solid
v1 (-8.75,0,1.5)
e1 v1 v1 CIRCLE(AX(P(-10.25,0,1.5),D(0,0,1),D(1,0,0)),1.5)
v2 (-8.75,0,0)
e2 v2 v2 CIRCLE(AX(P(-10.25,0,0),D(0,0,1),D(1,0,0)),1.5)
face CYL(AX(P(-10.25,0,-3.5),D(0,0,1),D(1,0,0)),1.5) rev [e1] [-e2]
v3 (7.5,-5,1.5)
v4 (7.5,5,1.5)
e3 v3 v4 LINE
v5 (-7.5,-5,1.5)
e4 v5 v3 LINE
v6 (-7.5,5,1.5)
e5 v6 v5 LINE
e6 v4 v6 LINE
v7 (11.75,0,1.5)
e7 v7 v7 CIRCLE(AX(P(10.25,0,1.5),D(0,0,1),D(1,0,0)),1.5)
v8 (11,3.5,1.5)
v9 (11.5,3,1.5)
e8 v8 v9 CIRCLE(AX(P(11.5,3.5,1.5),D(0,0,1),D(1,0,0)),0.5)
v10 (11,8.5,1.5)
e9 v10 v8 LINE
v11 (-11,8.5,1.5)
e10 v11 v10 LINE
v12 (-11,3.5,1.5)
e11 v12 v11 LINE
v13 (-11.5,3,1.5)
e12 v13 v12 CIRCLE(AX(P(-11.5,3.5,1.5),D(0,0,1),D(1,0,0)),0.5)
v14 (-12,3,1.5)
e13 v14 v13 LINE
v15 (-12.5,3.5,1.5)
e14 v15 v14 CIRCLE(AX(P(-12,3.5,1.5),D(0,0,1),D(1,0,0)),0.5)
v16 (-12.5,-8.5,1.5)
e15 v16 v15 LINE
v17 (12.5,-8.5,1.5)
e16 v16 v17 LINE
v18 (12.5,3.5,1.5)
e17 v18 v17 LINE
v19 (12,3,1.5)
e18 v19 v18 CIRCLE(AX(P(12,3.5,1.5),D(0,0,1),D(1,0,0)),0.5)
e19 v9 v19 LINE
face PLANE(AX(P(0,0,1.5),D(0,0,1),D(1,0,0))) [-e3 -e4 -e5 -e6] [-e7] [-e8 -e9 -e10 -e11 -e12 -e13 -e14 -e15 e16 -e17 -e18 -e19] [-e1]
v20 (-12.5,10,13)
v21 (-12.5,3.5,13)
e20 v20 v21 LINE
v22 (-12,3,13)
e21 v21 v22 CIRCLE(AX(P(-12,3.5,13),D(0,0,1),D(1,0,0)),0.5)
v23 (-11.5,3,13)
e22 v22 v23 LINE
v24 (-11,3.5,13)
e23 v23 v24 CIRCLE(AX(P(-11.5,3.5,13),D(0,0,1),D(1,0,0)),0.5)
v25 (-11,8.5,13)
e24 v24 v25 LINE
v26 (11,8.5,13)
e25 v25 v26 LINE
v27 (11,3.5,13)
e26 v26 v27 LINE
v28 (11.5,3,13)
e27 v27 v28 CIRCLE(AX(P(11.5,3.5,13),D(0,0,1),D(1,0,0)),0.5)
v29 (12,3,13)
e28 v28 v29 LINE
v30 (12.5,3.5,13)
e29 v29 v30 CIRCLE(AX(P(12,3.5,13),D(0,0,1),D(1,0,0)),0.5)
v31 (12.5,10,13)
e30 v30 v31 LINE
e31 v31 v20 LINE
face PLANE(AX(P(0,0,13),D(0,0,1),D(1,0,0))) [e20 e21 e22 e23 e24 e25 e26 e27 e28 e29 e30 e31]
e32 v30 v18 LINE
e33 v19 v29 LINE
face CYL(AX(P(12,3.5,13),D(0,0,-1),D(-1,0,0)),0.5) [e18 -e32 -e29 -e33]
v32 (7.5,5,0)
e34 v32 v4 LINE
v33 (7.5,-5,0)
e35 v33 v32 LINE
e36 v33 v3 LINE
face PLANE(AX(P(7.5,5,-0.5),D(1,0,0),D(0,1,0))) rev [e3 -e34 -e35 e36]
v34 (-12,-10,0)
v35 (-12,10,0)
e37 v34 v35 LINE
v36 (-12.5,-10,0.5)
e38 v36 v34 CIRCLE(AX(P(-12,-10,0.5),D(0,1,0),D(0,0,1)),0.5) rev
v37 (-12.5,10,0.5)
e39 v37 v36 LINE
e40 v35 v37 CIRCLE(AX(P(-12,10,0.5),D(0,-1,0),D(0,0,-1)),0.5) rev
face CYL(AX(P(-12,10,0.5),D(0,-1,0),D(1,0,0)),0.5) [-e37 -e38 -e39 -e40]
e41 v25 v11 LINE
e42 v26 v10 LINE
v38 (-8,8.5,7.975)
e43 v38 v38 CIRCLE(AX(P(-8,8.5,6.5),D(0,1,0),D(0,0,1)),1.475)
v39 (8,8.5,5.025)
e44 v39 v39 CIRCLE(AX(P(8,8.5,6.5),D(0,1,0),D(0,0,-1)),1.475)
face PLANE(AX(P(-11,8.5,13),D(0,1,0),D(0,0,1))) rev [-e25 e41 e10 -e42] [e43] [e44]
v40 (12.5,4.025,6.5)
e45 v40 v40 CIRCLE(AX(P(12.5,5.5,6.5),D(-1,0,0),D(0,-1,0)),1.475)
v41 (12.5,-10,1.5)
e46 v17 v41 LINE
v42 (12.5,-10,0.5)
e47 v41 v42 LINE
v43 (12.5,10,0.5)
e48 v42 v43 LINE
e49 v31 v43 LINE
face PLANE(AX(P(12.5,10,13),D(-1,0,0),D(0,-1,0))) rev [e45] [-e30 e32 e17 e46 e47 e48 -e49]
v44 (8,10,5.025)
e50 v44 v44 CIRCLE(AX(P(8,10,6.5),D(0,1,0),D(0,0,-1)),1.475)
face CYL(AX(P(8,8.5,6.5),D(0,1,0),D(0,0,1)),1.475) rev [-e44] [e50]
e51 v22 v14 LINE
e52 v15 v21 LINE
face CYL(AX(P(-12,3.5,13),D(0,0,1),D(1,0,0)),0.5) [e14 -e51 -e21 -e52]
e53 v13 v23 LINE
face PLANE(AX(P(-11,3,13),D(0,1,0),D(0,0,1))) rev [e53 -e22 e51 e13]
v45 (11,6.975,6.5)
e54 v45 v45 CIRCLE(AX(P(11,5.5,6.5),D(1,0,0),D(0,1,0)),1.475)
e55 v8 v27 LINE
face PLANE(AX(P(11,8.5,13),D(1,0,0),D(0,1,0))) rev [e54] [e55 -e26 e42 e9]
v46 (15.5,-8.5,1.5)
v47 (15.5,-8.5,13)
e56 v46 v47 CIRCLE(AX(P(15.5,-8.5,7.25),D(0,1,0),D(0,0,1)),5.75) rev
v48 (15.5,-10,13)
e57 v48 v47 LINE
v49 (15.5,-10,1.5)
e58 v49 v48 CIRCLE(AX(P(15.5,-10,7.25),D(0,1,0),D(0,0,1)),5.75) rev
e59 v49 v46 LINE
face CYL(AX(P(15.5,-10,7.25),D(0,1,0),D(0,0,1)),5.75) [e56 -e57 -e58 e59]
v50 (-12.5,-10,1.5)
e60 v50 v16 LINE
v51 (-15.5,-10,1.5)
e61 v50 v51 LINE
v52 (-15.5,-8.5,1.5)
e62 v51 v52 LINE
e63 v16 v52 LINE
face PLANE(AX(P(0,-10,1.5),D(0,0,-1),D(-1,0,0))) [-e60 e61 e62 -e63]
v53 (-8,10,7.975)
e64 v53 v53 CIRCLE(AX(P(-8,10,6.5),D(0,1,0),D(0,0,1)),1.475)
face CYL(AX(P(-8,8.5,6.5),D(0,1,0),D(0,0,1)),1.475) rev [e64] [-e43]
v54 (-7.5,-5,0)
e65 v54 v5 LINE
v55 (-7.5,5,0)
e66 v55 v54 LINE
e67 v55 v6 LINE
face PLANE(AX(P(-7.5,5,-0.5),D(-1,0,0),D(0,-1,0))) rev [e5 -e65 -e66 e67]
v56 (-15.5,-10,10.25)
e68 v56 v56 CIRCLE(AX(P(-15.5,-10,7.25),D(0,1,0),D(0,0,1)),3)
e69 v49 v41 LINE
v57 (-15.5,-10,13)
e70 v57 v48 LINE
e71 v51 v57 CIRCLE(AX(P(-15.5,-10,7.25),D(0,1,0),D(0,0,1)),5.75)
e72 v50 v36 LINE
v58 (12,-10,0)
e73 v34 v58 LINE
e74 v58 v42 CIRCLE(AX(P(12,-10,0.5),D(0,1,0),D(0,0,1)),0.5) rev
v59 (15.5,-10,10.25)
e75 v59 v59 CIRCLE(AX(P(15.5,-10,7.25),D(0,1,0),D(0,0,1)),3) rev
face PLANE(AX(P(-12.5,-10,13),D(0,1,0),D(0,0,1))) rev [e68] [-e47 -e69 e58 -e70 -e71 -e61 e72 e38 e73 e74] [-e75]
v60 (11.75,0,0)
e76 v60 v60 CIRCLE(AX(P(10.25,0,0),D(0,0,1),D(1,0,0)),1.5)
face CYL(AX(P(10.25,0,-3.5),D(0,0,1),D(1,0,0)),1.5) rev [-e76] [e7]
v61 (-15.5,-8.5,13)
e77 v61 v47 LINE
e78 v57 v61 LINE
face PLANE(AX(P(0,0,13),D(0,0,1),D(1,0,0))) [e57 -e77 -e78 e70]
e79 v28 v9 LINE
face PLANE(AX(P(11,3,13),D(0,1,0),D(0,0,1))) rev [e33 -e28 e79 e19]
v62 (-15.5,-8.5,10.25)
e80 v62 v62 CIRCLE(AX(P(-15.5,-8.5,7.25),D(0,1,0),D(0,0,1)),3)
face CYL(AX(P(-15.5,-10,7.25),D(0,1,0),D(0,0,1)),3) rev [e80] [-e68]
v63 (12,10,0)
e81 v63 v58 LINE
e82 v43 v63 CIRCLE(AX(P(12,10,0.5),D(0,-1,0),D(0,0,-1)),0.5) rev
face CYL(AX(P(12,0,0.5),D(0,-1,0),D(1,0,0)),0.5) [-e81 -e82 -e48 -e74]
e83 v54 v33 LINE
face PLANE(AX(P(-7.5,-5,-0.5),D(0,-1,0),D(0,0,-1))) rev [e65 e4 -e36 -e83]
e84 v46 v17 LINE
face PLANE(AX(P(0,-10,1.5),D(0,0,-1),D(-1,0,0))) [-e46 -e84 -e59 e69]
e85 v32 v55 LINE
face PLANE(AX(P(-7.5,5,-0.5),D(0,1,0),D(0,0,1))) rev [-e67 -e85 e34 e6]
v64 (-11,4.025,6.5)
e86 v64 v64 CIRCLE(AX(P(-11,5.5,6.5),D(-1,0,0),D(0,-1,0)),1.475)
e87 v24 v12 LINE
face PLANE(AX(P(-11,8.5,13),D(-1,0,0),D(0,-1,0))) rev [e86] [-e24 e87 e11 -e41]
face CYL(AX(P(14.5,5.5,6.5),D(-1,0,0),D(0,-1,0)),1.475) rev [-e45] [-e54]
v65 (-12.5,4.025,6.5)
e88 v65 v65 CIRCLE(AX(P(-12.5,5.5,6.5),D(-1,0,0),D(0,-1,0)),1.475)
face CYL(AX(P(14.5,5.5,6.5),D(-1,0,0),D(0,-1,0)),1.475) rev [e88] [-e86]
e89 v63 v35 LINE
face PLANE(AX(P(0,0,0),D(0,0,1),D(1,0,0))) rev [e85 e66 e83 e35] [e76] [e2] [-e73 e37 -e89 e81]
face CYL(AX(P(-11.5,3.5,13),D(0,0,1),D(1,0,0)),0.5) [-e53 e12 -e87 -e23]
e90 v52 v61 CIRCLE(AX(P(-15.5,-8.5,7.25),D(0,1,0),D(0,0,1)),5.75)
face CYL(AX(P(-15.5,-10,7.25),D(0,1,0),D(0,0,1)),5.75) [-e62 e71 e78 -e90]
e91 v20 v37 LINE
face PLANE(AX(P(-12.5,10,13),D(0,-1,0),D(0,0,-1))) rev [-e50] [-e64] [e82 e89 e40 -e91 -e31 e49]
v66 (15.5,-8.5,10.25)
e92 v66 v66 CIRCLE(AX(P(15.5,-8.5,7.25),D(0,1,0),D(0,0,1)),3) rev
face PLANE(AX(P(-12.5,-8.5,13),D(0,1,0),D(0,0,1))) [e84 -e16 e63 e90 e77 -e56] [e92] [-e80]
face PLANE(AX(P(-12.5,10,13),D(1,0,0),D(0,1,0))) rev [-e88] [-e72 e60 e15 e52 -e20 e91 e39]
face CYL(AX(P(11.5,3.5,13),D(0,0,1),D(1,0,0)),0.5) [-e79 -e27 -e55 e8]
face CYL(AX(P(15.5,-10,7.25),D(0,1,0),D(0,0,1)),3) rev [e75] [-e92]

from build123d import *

# Parameters (mm, degrees)
SKETCH_1_W          = 25
SKETCH_1_H          = 20
EXTRUDE_1_DEPTH     = 13
SHELL_7_T           = -1.5
SKETCH_3_R          = 1.5
CUT_EXTRUDE_1_DEPTH = 5
SKETCH_4_W          = 15
SKETCH_4_H          = 10
CUT_EXTRUDE_2_DEPTH = 2
SKETCH_6_W          = 12.730573974
SKETCH_6_H          = 22.360557323
CUT_EXTRUDE_5_DEPTH = 38.5
EXTRUDE_START       = -1.5
EXTRUDE_4_OUTLINE_R = 3
EXTRUDE_4_DEPTH     = 1.5
EXTRUDE_5_DEPTH     = 11.5
SKETCH_12_R         = 1.475
CUT_EXTRUDE_6_DEPTH = 1.5
SKETCH_14_R         = 1.475
CUT_EXTRUDE_7_DEPTH = 27
FILLET_2_R          = 0.5
FILLET_3_R          = 0.5
FILLET_4_R          = 0.5
FILLET_5_R          = 0.5
FILLET_6_R          = 0.5
FILLET_7_R          = 0.5


with BuildPart() as part:
    # 草图1 → 凸台-拉伸1 (new body)
    with BuildSketch(Plane.XY):
        Rectangle(SKETCH_1_W, SKETCH_1_H)
    extrude(amount=EXTRUDE_1_DEPTH)

    # 抽壳7
    shell_7_openings = [part.faces().sort_by_distance(p)[0] for p in [
        (0, 0, 13),
    ]]
    offset(amount=SHELL_7_T, openings=shell_7_openings, kind=Kind.INTERSECTION)

    # 草图3 → 切除-拉伸1 (cut)
    with BuildSketch(Plane.XY.offset(1.5)):
        with Locations((-10.25, 0)):
            Circle(SKETCH_3_R)
        with Locations((10.25, 0)):
            Circle(SKETCH_3_R)
    extrude(amount=-CUT_EXTRUDE_1_DEPTH, mode=Mode.SUBTRACT)

    # 草图4 → 切除-拉伸2 (cut)
    with BuildSketch(Plane.XY.offset(1.5)):
        Rectangle(SKETCH_4_W, SKETCH_4_H)
    extrude(amount=-CUT_EXTRUDE_2_DEPTH, mode=Mode.SUBTRACT)

    # 草图6 → 切除-拉伸5 (cut, symmetric)
    with BuildSketch(Plane(origin=(-11, 0, 0), x_dir=(0, 0, -1), z_dir=(1, 0, 0))):
        with Locations((-7.865286987, 2.680278662)):
            Rectangle(SKETCH_6_W, SKETCH_6_H)
    extrude(amount=CUT_EXTRUDE_5_DEPTH, both=True, mode=Mode.SUBTRACT)

    # 凸台-拉伸4: read off the stored shape, not the designer's step
    # 凸台-拉伸4 outline → 凸台-拉伸4 (add)
    with BuildSketch(Plane(origin=(0, -8.5, 0), x_dir=(1, 0, 0), z_dir=(0, 1, 0)).offset(EXTRUDE_START)):
        with BuildLine():
            Line((15.5, -1.5), (-15.5, -1.5))
            ThreePointArc((-15.5, -1.5), (-21.25, -7.25), (-15.5, -13))
            Line((-15.5, -13), (15.5, -13))
            ThreePointArc((15.5, -13), (21.25, -7.25), (15.5, -1.5))
        make_face()
        with Locations((-15.5, -7.25)):
            Circle(EXTRUDE_4_OUTLINE_R, mode=Mode.SUBTRACT)
        with Locations((15.5, -7.25)):
            Circle(EXTRUDE_4_OUTLINE_R, mode=Mode.SUBTRACT)
    extrude(amount=EXTRUDE_4_DEPTH)

    # 草图11 → 凸台-拉伸5 (add)
    with BuildSketch(Plane.XY.offset(1.5)):
        Polygon((-11, 8.5), (11, 8.5), (11, 3), (12.5, 3), (12.5, 10), (-12.5, 10), (-12.5, 3), (-11, 3), align=None)
    extrude(amount=EXTRUDE_5_DEPTH)

    # 草图12 → 切除-拉伸6 (cut)
    with BuildSketch(Plane(origin=(0, 10, 0), x_dir=(1, 0, 0), z_dir=(0, 1, 0))):
        with Locations(Location((-8, -6.5, 0), (0, 0, 270))):
            Circle(SKETCH_12_R)
        with Locations(Location((8, -6.5, 0), (0, 0, 90))):
            Circle(SKETCH_12_R)
    extrude(amount=-CUT_EXTRUDE_6_DEPTH, mode=Mode.SUBTRACT)

    # 草图14 → 切除-拉伸7 (cut)
    with BuildSketch(Plane.ZY.offset(12.5)):
        with Locations(Location((6.5, 5.5, 0), (0, 0, 270))):
            Circle(SKETCH_14_R)
    extrude(amount=-CUT_EXTRUDE_7_DEPTH, mode=Mode.SUBTRACT)

    # 圆角2
    fillet_2_edges = [part.edges().sort_by_distance(p)[0] for p in [
        (-12.5, 0, 0),
    ]]
    fillet(fillet_2_edges, radius=FILLET_2_R)

    # 圆角3
    fillet_3_edges = [part.edges().sort_by_distance(p)[0] for p in [
        (12.5, 0, 0),
    ]]
    fillet(fillet_3_edges, radius=FILLET_3_R)

    # 圆角4
    fillet_4_edges = [part.edges().sort_by_distance(p)[0] for p in [
        (12.5, 3, 7.25),
    ]]
    fillet(fillet_4_edges, radius=FILLET_4_R)

    # 圆角5
    fillet_5_edges = [part.edges().sort_by_distance(p)[0] for p in [
        (11, 3, 7.25),
    ]]
    fillet(fillet_5_edges, radius=FILLET_5_R)

    # 圆角6
    fillet_6_edges = [part.edges().sort_by_distance(p)[0] for p in [
        (-12.5, 3, 7.25),
    ]]
    fillet(fillet_6_edges, radius=FILLET_6_R)

    # 圆角7
    fillet_7_edges = [part.edges().sort_by_distance(p)[0] for p in [
        (-11, 3, 7.25),
    ]]
    fillet(fillet_7_edges, radius=FILLET_7_R)


solid = part.part
